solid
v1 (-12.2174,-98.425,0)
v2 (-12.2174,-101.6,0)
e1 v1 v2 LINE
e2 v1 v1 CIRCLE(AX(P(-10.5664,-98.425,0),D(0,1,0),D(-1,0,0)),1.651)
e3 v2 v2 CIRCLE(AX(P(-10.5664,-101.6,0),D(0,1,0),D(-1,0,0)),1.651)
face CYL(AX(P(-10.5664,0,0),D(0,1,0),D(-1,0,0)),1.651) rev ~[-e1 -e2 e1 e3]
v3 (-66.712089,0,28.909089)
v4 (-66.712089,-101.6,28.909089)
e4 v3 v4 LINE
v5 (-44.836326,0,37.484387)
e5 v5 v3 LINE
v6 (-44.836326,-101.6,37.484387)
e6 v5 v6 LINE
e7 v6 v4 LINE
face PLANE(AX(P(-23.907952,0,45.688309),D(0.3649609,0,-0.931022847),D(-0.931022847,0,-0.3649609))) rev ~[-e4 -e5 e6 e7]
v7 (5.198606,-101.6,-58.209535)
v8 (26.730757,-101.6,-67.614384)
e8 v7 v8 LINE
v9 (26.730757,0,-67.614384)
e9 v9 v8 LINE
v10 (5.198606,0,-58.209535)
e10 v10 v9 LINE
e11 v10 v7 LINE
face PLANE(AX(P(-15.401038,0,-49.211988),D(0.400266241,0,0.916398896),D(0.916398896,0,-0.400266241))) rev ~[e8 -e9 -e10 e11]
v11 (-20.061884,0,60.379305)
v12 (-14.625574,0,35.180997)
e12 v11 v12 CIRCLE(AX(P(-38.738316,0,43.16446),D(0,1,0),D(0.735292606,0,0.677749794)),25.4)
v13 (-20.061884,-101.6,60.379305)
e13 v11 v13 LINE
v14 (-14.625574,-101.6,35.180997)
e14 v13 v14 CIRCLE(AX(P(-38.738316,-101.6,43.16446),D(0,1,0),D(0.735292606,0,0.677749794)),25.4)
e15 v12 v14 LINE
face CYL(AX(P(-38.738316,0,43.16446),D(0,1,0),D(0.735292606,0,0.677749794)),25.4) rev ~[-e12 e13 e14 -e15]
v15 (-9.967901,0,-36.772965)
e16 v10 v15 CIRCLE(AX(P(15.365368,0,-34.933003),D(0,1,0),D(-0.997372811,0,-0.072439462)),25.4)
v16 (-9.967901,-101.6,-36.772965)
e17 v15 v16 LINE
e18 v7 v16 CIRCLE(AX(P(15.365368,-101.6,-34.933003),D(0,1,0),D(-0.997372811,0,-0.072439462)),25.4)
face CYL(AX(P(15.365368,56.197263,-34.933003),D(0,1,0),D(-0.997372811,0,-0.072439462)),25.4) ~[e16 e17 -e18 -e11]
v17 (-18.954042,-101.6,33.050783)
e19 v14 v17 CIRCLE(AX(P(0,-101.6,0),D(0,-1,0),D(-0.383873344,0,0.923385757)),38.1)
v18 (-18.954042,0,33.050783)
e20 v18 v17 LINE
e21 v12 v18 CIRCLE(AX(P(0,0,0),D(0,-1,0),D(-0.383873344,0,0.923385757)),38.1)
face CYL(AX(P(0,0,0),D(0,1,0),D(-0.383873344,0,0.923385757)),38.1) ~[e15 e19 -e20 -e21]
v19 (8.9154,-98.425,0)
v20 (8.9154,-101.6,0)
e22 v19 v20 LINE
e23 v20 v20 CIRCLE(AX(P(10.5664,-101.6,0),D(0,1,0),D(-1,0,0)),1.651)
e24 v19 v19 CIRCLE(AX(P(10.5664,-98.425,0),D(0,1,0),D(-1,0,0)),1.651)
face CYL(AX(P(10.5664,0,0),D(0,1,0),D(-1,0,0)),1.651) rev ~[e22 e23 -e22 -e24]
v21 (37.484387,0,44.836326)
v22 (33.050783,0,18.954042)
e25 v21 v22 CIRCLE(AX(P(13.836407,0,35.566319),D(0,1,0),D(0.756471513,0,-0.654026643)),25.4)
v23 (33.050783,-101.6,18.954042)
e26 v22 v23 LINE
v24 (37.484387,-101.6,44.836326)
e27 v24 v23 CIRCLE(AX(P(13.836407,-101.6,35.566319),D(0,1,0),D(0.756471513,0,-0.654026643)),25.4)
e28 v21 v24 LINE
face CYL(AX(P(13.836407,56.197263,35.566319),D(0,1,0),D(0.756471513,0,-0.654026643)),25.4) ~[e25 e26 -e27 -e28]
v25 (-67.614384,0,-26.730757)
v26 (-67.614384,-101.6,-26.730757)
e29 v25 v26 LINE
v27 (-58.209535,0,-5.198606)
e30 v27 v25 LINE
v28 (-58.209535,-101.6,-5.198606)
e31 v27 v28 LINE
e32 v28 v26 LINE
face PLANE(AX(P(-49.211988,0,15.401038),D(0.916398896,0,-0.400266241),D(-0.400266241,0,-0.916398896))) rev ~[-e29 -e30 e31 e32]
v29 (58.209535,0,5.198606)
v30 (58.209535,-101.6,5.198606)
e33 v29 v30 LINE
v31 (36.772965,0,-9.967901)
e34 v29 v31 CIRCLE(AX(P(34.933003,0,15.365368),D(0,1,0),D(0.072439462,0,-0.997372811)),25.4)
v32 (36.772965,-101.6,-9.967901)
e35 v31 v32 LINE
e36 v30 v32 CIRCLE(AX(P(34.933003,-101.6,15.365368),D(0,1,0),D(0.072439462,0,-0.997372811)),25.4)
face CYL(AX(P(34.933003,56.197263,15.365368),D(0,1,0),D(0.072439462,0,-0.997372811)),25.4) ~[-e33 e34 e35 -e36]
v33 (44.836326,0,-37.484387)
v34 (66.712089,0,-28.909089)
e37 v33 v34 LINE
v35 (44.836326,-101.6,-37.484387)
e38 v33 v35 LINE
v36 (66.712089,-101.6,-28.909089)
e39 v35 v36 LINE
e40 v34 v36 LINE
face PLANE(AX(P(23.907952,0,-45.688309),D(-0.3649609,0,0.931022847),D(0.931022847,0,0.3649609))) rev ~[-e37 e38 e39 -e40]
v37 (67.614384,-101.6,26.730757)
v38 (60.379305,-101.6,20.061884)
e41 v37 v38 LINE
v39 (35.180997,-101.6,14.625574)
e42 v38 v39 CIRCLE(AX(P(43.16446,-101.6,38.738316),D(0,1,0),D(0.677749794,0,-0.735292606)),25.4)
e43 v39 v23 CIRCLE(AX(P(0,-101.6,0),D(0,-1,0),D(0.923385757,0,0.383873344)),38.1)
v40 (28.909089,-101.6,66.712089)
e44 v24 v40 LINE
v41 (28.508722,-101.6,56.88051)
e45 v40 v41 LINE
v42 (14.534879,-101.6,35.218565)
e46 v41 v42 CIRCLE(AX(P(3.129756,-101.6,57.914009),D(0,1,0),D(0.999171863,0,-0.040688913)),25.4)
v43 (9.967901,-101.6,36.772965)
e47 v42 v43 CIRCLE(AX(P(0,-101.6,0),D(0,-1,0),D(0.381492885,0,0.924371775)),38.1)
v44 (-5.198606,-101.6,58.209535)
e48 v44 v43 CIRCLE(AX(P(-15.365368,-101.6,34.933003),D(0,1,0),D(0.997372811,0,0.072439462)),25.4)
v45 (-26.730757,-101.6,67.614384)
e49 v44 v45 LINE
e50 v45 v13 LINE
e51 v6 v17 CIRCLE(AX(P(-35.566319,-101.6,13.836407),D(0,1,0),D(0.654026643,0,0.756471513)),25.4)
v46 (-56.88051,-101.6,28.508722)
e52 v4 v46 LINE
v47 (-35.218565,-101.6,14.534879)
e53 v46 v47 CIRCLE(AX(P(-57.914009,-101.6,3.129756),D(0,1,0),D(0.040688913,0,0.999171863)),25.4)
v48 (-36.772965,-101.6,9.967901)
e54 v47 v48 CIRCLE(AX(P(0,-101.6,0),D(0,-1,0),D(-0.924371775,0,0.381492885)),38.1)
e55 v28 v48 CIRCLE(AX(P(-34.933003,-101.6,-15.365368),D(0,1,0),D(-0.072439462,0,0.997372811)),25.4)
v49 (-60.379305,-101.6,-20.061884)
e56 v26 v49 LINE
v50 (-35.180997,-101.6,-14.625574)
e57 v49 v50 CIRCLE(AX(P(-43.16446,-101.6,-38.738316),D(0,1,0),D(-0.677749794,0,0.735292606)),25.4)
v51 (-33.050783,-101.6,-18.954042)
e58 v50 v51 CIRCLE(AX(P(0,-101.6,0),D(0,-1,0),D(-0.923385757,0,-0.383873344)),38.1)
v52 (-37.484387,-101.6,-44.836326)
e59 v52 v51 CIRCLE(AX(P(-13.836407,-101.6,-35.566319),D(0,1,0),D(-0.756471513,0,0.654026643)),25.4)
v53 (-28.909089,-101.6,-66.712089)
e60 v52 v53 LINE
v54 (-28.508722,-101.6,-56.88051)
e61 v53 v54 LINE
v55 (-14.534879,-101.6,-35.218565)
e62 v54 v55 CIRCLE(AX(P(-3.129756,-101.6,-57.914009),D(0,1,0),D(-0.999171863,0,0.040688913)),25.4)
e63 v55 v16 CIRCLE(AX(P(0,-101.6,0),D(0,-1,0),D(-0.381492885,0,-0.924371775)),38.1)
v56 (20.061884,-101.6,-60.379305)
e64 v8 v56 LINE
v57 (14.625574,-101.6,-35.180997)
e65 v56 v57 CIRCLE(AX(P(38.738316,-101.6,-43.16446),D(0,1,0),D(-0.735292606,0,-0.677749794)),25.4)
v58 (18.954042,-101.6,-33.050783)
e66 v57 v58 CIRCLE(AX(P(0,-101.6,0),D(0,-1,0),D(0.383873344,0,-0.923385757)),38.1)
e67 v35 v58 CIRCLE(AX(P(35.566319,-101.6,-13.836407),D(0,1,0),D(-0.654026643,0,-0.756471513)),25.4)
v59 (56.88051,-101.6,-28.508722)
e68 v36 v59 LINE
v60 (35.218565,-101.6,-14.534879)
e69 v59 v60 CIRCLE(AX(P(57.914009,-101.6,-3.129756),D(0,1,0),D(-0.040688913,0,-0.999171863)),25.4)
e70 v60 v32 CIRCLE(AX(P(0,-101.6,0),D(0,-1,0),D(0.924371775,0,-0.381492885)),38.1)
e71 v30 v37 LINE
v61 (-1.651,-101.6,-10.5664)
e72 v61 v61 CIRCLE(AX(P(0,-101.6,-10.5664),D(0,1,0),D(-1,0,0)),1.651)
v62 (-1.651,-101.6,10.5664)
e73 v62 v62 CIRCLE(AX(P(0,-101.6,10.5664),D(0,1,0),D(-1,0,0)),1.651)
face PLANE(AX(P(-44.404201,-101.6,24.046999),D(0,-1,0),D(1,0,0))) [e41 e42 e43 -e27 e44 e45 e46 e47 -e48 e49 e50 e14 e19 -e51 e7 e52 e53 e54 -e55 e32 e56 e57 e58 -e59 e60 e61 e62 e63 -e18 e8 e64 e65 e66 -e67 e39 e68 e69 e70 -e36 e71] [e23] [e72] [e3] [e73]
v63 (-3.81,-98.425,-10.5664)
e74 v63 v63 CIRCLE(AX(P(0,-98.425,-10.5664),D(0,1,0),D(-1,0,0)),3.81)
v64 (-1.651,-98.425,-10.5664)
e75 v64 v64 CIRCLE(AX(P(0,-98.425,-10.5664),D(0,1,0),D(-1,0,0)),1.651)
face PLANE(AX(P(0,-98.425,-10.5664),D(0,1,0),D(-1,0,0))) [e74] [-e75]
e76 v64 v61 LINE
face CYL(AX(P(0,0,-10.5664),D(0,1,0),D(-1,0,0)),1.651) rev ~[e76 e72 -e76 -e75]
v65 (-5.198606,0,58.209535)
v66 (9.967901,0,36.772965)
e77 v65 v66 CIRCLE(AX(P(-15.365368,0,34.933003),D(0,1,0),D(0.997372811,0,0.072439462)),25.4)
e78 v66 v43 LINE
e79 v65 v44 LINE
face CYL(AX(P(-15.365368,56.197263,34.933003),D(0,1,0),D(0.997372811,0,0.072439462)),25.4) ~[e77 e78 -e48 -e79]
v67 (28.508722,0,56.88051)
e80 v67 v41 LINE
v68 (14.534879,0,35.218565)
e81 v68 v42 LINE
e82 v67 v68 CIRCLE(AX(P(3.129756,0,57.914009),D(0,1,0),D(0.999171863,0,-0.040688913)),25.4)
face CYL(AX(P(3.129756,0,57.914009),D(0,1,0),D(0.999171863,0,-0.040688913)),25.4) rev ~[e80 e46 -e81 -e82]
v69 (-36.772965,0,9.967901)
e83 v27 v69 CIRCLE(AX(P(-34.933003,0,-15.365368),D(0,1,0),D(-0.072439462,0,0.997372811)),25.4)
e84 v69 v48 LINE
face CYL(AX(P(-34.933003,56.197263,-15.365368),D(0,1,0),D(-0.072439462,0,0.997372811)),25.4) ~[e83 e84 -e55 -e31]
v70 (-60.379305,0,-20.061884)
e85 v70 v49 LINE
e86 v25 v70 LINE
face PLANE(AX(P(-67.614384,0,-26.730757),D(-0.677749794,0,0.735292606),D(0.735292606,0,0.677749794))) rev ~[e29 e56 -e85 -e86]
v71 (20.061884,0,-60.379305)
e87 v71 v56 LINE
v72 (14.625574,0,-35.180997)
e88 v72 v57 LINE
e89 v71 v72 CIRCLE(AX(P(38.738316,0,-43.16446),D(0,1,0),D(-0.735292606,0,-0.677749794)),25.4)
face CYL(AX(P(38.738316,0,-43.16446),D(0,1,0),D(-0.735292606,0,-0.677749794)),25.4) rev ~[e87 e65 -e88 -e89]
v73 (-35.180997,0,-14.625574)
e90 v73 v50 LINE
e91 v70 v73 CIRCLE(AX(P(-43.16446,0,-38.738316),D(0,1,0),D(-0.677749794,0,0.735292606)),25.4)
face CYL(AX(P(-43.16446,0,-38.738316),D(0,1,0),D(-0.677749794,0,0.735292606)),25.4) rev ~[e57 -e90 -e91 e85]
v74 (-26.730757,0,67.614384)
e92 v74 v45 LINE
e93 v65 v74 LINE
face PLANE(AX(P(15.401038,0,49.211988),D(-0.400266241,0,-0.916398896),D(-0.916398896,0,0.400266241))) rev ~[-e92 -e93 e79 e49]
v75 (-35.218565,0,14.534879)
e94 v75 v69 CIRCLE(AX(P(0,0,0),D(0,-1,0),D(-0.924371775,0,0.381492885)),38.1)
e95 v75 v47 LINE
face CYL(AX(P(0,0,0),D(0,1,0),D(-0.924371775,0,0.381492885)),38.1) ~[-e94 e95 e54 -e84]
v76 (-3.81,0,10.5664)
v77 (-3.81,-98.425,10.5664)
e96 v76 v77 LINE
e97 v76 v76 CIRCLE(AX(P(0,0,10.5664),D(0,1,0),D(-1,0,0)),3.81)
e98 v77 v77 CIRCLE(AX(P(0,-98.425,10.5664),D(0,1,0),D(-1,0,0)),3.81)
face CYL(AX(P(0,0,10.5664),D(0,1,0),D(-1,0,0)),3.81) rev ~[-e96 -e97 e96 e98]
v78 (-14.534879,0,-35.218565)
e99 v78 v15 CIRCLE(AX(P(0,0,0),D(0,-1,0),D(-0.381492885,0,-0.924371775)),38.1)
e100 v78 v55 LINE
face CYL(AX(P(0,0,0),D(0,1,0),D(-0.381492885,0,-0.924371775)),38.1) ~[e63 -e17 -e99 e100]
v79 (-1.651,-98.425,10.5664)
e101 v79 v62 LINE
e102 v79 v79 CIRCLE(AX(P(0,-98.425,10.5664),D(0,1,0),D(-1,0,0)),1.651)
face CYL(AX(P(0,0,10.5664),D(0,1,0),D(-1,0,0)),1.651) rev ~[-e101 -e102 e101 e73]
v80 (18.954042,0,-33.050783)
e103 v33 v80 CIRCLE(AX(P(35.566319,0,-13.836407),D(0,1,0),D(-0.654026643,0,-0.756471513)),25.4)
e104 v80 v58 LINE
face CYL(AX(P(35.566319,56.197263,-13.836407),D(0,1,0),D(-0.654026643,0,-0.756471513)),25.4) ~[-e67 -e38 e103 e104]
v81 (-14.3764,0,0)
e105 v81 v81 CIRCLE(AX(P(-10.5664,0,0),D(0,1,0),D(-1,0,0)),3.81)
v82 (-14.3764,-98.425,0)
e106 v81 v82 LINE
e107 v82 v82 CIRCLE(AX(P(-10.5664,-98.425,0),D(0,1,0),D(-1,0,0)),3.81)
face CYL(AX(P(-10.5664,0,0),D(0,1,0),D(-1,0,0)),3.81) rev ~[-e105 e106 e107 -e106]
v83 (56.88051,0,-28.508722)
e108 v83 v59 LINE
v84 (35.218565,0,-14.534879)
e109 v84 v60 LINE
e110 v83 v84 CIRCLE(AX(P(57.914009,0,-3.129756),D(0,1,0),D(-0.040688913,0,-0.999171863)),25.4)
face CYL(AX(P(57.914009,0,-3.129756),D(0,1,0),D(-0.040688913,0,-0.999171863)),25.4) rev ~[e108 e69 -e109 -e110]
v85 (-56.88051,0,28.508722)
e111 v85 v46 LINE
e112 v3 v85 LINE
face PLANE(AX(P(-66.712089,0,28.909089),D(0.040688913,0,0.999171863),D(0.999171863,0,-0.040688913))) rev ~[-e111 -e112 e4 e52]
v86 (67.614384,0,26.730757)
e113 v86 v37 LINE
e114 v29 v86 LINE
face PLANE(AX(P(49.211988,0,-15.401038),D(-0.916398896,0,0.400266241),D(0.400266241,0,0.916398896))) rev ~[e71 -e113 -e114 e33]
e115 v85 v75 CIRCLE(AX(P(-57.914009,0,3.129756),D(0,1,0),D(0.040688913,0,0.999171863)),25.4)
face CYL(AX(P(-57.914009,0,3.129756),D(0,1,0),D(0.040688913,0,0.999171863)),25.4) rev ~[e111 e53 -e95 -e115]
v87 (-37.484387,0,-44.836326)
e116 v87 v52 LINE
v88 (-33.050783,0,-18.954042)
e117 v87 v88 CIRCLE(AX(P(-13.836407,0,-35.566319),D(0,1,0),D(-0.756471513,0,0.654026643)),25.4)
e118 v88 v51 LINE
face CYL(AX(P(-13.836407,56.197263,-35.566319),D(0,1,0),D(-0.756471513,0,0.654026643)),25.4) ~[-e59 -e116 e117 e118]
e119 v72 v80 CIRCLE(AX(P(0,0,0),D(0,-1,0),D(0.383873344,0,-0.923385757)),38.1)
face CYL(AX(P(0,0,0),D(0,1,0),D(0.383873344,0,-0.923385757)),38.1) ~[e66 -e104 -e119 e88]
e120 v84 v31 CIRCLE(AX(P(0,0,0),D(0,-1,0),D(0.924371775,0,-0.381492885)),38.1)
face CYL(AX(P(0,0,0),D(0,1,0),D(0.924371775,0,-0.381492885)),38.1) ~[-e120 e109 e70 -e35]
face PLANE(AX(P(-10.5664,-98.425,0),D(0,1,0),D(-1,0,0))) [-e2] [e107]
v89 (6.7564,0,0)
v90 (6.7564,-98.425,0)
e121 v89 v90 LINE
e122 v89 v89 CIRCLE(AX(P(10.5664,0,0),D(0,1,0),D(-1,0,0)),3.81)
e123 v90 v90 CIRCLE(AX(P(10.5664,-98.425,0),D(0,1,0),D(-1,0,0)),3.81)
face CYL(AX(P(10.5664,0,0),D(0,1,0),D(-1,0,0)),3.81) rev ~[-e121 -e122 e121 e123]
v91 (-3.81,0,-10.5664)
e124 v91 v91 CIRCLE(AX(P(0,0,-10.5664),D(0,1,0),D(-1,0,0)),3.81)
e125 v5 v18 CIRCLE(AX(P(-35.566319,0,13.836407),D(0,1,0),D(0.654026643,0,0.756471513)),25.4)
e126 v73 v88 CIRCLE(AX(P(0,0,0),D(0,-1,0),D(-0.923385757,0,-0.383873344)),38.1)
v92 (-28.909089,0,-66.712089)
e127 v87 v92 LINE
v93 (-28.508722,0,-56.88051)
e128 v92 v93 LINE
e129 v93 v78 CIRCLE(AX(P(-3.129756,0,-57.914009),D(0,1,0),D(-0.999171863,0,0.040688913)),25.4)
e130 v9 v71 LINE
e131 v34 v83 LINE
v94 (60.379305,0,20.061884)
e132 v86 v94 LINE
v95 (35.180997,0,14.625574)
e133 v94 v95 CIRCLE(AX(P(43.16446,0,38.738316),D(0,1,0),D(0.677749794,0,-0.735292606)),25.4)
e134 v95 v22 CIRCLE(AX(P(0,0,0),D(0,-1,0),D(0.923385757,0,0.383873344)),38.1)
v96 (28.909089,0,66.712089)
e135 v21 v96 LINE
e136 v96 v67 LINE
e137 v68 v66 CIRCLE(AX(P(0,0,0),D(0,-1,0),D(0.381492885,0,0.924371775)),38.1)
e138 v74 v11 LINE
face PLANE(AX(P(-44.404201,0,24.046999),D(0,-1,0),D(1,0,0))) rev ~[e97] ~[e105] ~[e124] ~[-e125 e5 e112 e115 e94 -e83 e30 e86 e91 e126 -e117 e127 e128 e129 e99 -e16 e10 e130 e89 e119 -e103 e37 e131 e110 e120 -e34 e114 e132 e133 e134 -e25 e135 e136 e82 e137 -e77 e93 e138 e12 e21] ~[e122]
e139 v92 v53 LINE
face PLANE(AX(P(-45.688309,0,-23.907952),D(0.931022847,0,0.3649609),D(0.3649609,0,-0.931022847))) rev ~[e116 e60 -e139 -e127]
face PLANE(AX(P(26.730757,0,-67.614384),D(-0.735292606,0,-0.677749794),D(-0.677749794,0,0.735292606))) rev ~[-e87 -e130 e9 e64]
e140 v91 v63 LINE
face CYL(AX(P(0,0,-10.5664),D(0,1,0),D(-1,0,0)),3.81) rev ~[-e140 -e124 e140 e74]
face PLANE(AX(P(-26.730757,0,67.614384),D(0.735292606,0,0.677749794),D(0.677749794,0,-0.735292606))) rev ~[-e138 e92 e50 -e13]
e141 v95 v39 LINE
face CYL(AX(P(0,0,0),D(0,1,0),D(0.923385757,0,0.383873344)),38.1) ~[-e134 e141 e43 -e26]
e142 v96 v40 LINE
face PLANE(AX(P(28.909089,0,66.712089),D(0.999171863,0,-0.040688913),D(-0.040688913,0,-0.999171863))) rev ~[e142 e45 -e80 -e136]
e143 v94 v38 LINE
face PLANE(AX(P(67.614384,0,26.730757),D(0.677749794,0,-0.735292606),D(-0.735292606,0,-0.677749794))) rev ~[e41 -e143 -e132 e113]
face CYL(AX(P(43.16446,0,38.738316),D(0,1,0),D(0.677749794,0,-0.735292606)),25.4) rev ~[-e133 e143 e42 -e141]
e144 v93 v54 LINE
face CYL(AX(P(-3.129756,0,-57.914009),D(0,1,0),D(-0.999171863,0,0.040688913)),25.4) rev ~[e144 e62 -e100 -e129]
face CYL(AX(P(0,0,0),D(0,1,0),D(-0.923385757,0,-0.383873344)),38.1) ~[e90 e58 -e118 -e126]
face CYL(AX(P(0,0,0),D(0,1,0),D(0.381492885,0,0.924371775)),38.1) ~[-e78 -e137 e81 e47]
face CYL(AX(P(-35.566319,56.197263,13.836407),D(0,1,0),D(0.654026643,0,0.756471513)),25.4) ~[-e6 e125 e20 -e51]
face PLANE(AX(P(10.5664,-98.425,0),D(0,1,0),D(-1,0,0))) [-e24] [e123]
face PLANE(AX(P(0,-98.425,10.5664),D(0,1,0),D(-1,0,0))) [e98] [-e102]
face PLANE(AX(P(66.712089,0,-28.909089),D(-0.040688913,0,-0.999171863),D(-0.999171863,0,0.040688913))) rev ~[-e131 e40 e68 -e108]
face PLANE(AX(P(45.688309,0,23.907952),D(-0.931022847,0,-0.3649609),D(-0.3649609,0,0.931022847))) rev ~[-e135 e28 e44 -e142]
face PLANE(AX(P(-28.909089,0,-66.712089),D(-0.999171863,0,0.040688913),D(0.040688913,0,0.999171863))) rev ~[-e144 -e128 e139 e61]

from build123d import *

# Parameters (mm, degrees)
F1_DEPTH    = 101.6
F2_T1_DEPTH = 101.6
F2_T3_DEPTH = 213.9945264783
F3_R        = 1.651
F4_DEPTH    = 127
F5_R        = 3.81
F5_R_2      = 1.651
F6_DEPTH    = 98.425


# Not quite as in the source:
# - a fillet or chamfer that OpenCascade refuses, or shapes differently, is made with other operations: its cross-section is extruded or revolved along the edge and cut away or added


with BuildPart() as f1:
    # F0 (on Front) → F1 (new body)
    with BuildSketch(Plane.XZ):
        with BuildLine():
            ThreePointArc((36.7729649274, -9.9679010051), (37.7667841081, -5.0279238392), (38.1, 0))
            ThreePointArc((38.1, 0), (37.363123518, 7.4570101903), (35.1809973239, 14.6255744261))
            ThreePointArc((35.1809973239, 14.6255744261), (34.1844683928, 16.823558503), (33.0507832594, 18.9540424696))
            ThreePointArc((33.0507832594, 18.9540424696), (25.1442335653, 28.6247710631), (14.5348789212, 35.2185646321))
            ThreePointArc((14.5348789212, 35.2185646321), (12.2760171106, 36.068121713), (9.9679010051, 36.7729649274))
            ThreePointArc((9.9679010051, 36.7729649274), (-2.4611116668, 38.0204277904), (-14.6255744261, 35.1809973239))
            ThreePointArc((-14.6255744261, 35.1809973239), (-16.823558503, 34.1844683928), (-18.9540424696, 33.0507832594))
            ThreePointArc((-18.9540424696, 33.0507832594), (-28.6247710631, 25.1442335653), (-35.2185646321, 14.5348789212))
            ThreePointArc((-35.2185646321, 14.5348789212), (-36.068121713, 12.2760171106), (-36.7729649274, 9.9679010051))
            ThreePointArc((-36.7729649274, 9.9679010051), (-38.0204277904, -2.4611116668), (-35.1809973239, -14.6255744261))
            ThreePointArc((-35.1809973239, -14.6255744261), (-34.1844683928, -16.823558503), (-33.0507832594, -18.9540424696))
            ThreePointArc((-33.0507832594, -18.9540424696), (-25.1442335653, -28.6247710631), (-14.5348789212, -35.2185646321))
            ThreePointArc((-14.5348789212, -35.2185646321), (-12.2760171106, -36.068121713), (-9.9679010051, -36.7729649274))
            ThreePointArc((-9.9679010051, -36.7729649274), (2.4611116668, -38.0204277904), (14.6255744261, -35.1809973239))
            ThreePointArc((14.6255744261, -35.1809973239), (16.823558503, -34.1844683928), (18.9540424696, -33.0507832594))
            ThreePointArc((18.9540424696, -33.0507832594), (28.6247710631, -25.1442335653), (35.2185646321, -14.5348789212))
            ThreePointArc((35.2185646321, -14.5348789212), (36.068121713, -12.2760171106), (36.7729649274, -9.9679010051))
        make_face()
        with BuildLine():
            ThreePointArc((-35.2185646321, 14.5348789212), (-28.6247710631, 25.1442335653), (-18.9540424696, 33.0507832594))
            Line((-18.9540424696, 33.0507832594), (-23.9079516621, 45.688308647))
            Line((-23.9079516621, 45.688308647), (-66.712088778, 28.9090894698))
            Line((-66.712088778, 28.9090894698), (-41.705504873, 27.890755436))
            Line((-41.705504873, 27.890755436), (-35.2185646321, 14.5348789212))
        make_face()
        with BuildLine():
            ThreePointArc((-14.6255744261, 35.1809973239), (-2.4611116668, 38.0204277904), (9.9679010051, 36.7729649274))
            Line((9.9679010051, 36.7729649274), (15.4010381207, 49.2119876098))
            Line((15.4010381207, 49.2119876098), (-26.7307571601, 67.6143835641))
            Line((-26.7307571601, 67.6143835641), (-9.7685030073, 49.2119876098))
            Line((-9.7685030073, 49.2119876098), (-14.6255744261, 35.1809973239))
        make_face()
        with BuildLine():
            ThreePointArc((14.5348789212, 35.2185646321), (25.1442335653, 28.6247710631), (33.0507832594, 18.9540424696))
            Line((33.0507832594, 18.9540424696), (45.688308647, 23.9079516621))
            Line((45.688308647, 23.9079516621), (28.9090894698, 66.712088778))
            Line((28.9090894698, 66.712088778), (27.890755436, 41.705504873))
            Line((27.890755436, 41.705504873), (14.5348789212, 35.2185646321))
        make_face()
        with BuildLine():
            ThreePointArc((35.1809973239, 14.6255744261), (37.363123518, 7.4570101903), (38.1, 0))
            ThreePointArc((38.1, 0), (37.7667841081, -5.0279238392), (36.7729649274, -9.9679010051))
            Line((36.7729649274, -9.9679010051), (49.2119876098, -15.4010381207))
            Line((49.2119876098, -15.4010381207), (67.6143835641, 26.7307571601))
            Line((67.6143835641, 26.7307571601), (49.2119876098, 9.7685030073))
            Line((49.2119876098, 9.7685030073), (35.1809973239, 14.6255744261))
        make_face()
        with BuildLine():
            Line((41.705504873, -27.890755436), (35.2185646321, -14.5348789212))
            ThreePointArc((35.2185646321, -14.5348789212), (28.6247710631, -25.1442335653), (18.9540424696, -33.0507832594))
            Line((18.9540424696, -33.0507832594), (23.9079516621, -45.688308647))
            Line((23.9079516621, -45.688308647), (66.712088778, -28.9090894698))
            Line((66.712088778, -28.9090894698), (41.705504873, -27.890755436))
        make_face()
        with BuildLine():
            Line((9.7685030073, -49.2119876098), (14.6255744261, -35.1809973239))
            ThreePointArc((14.6255744261, -35.1809973239), (2.4611116668, -38.0204277904), (-9.9679010051, -36.7729649274))
            Line((-9.9679010051, -36.7729649274), (-15.4010381207, -49.2119876098))
            Line((-15.4010381207, -49.2119876098), (26.7307571601, -67.6143835641))
            Line((26.7307571601, -67.6143835641), (9.7685030073, -49.2119876098))
        make_face()
        with BuildLine():
            Line((-27.890755436, -41.705504873), (-14.5348789212, -35.2185646321))
            ThreePointArc((-14.5348789212, -35.2185646321), (-25.1442335653, -28.6247710631), (-33.0507832594, -18.9540424696))
            Line((-33.0507832594, -18.9540424696), (-45.688308647, -23.9079516621))
            Line((-45.688308647, -23.9079516621), (-28.9090894698, -66.712088778))
            Line((-28.9090894698, -66.712088778), (-27.890755436, -41.705504873))
        make_face()
        with BuildLine():
            ThreePointArc((-35.1809973239, -14.6255744261), (-38.0204277904, -2.4611116668), (-36.7729649274, 9.9679010051))
            Line((-36.7729649274, 9.9679010051), (-49.2119876098, 15.4010381207))
            Line((-49.2119876098, 15.4010381207), (-67.6143835641, -26.7307571601))
            Line((-67.6143835641, -26.7307571601), (-49.2119876098, -9.7685030073))
            Line((-49.2119876098, -9.7685030073), (-35.1809973239, -14.6255744261))
        make_face()
    extrude(amount=F1_DEPTH)

    # F2: fillet of radius 25.4 on 16 edges, made by hand

    # F2_s2 → F2_t1 (join)
    with BuildSketch(Plane.XZ):
        with BuildLine():
            ThreePointArc((-56.8805102577, 28.5087216686), (-44.1451035636, 24.4740120759), (-35.2185646321, 14.5348789212))
            Line((-35.2185646321, 14.5348789212), (-41.705504873, 27.890755436))
            Line((-41.705504873, 27.890755436), (-56.8805102577, 28.5087216686))
        make_face()
        with BuildLine():
            ThreePointArc((-60.3793049354, -20.0618841058), (-48.5210419877, -13.9095621843), (-35.1809973239, -14.6255744261))
            Line((-35.1809973239, -14.6255744261), (-49.2119876098, -9.7685030073))
            Line((-49.2119876098, -9.7685030073), (-60.3793049354, -20.0618841058))
        make_face()
        with BuildLine():
            ThreePointArc((-28.5087216686, -56.8805102577), (-24.4740120759, -44.1451035636), (-14.5348789212, -35.2185646321))
            Line((-14.5348789212, -35.2185646321), (-27.890755436, -41.705504873))
            Line((-27.890755436, -41.705504873), (-28.5087216686, -56.8805102577))
        make_face()
        with BuildLine():
            ThreePointArc((20.0618841058, -60.3793049354), (13.9095621843, -48.5210419877), (14.6255744261, -35.1809973239))
            Line((14.6255744261, -35.1809973239), (9.7685030073, -49.2119876098))
            Line((9.7685030073, -49.2119876098), (20.0618841058, -60.3793049354))
        make_face()
        with BuildLine():
            ThreePointArc((56.8805102577, -28.5087216686), (44.1451035636, -24.4740120759), (35.2185646321, -14.5348789212))
            Line((35.2185646321, -14.5348789212), (41.705504873, -27.890755436))
            Line((41.705504873, -27.890755436), (56.8805102577, -28.5087216686))
        make_face()
        with BuildLine():
            ThreePointArc((60.3793049354, 20.0618841058), (48.5210419877, 13.9095621843), (35.1809973239, 14.6255744261))
            Line((35.1809973239, 14.6255744261), (49.2119876098, 9.7685030073))
            Line((49.2119876098, 9.7685030073), (60.3793049354, 20.0618841058))
        make_face()
        with BuildLine():
            ThreePointArc((28.5087216686, 56.8805102577), (24.4740120759, 44.1451035636), (14.5348789212, 35.2185646321))
            Line((14.5348789212, 35.2185646321), (27.890755436, 41.705504873))
            Line((27.890755436, 41.705504873), (28.5087216686, 56.8805102577))
        make_face()
        with BuildLine():
            ThreePointArc((-20.0618841058, 60.3793049354), (-13.9095621843, 48.5210419877), (-14.6255744261, 35.1809973239))
            Line((-14.6255744261, 35.1809973239), (-9.7685030073, 49.2119876098))
            Line((-9.7685030073, 49.2119876098), (-20.0618841058, 60.3793049354))
        make_face()
    extrude(amount=F2_T1_DEPTH)

    # F2_s4 → F2_t3 (cut)
    with BuildSketch(Plane.XZ.offset(-56.1972632391)):
        with BuildLine():
            ThreePointArc((-36.7729649274, 9.9679010051), (-49.6032208566, 5.3697394136), (-58.2095345387, -5.1986058702))
            Line((-58.2095345387, -5.1986058702), (-49.2119876098, 15.4010381207))
            Line((-49.2119876098, 15.4010381207), (-36.7729649274, 9.9679010051))
        make_face()
        with BuildLine():
            ThreePointArc((-18.9540424696, 33.0507832594), (-31.2777946839, 38.8717529889), (-44.8363260656, 37.4843871385))
            Line((-44.8363260656, 37.4843871385), (-23.9079516621, 45.688308647))
            Line((-23.9079516621, 45.688308647), (-18.9540424696, 33.0507832594))
        make_face()
        with BuildLine():
            ThreePointArc((9.9679010051, 36.7729649274), (5.3697394136, 49.6032208566), (-5.1986058702, 58.2095345387))
            Line((-5.1986058702, 58.2095345387), (15.4010381207, 49.2119876098))
            Line((15.4010381207, 49.2119876098), (9.9679010051, 36.7729649274))
        make_face()
        with BuildLine():
            ThreePointArc((33.0507832594, 18.9540424696), (38.8717529889, 31.2777946839), (37.4843871385, 44.8363260656))
            Line((37.4843871385, 44.8363260656), (45.688308647, 23.9079516621))
            Line((45.688308647, 23.9079516621), (33.0507832594, 18.9540424696))
        make_face()
        with BuildLine():
            ThreePointArc((36.7729649274, -9.9679010051), (49.6032208566, -5.3697394136), (58.2095345387, 5.1986058702))
            Line((58.2095345387, 5.1986058702), (49.2119876098, -15.4010381207))
            Line((49.2119876098, -15.4010381207), (36.7729649274, -9.9679010051))
        make_face()
        with BuildLine():
            ThreePointArc((18.9540424696, -33.0507832594), (31.2777946839, -38.8717529889), (44.8363260656, -37.4843871385))
            Line((44.8363260656, -37.4843871385), (23.9079516621, -45.688308647))
            Line((23.9079516621, -45.688308647), (18.9540424696, -33.0507832594))
        make_face()
        with BuildLine():
            ThreePointArc((-9.9679010051, -36.7729649274), (-5.3697394136, -49.6032208566), (5.1986058702, -58.2095345387))
            Line((5.1986058702, -58.2095345387), (-15.4010381207, -49.2119876098))
            Line((-15.4010381207, -49.2119876098), (-9.9679010051, -36.7729649274))
        make_face()
        with BuildLine():
            ThreePointArc((-33.0507832594, -18.9540424696), (-38.8717529889, -31.2777946839), (-37.4843871385, -44.8363260656))
            Line((-37.4843871385, -44.8363260656), (-45.688308647, -23.9079516621))
            Line((-45.688308647, -23.9079516621), (-33.0507832594, -18.9540424696))
        make_face()
    extrude(amount=F2_T3_DEPTH, mode=Mode.SUBTRACT)

    # F3 (on face) → F4 (cut)
    with BuildSketch(Plane(origin=(0, 0, 0), x_dir=(-1, 0, 0), z_dir=(0, 1, 0))):
        with Locations((0, 10.5664)):
            Circle(F3_R)
        with Locations((-10.5664, 0)):
            Circle(F3_R)
        with Locations((10.5664, 0)):
            Circle(F3_R)
        with Locations((0, -10.5664)):
            Circle(F3_R)
    extrude(amount=-F4_DEPTH, mode=Mode.SUBTRACT)

    # F5 (on face) → F6 (cut)
    with BuildSketch(Plane(origin=(0, 0, 0), x_dir=(-1, 0, 0), z_dir=(0, 1, 0))):
        with Locations((0, 10.5664)):
            Circle(F5_R)
        with Locations((0, 10.5664)):
            Circle(F5_R_2, mode=Mode.SUBTRACT)
        with Locations((10.5664, 0)):
            Circle(F5_R)
        with Locations((10.5664, 0)):
            Circle(F5_R_2, mode=Mode.SUBTRACT)
        with Locations((0, -10.5664)):
            Circle(F5_R)
        with Locations((0, -10.5664)):
            Circle(F5_R_2, mode=Mode.SUBTRACT)
        with Locations((-10.5664, 0)):
            Circle(F5_R)
        with Locations((-10.5664, 0)):
            Circle(F5_R_2, mode=Mode.SUBTRACT)
    extrude(amount=-F6_DEPTH, mode=Mode.SUBTRACT)


solid = f1.part
